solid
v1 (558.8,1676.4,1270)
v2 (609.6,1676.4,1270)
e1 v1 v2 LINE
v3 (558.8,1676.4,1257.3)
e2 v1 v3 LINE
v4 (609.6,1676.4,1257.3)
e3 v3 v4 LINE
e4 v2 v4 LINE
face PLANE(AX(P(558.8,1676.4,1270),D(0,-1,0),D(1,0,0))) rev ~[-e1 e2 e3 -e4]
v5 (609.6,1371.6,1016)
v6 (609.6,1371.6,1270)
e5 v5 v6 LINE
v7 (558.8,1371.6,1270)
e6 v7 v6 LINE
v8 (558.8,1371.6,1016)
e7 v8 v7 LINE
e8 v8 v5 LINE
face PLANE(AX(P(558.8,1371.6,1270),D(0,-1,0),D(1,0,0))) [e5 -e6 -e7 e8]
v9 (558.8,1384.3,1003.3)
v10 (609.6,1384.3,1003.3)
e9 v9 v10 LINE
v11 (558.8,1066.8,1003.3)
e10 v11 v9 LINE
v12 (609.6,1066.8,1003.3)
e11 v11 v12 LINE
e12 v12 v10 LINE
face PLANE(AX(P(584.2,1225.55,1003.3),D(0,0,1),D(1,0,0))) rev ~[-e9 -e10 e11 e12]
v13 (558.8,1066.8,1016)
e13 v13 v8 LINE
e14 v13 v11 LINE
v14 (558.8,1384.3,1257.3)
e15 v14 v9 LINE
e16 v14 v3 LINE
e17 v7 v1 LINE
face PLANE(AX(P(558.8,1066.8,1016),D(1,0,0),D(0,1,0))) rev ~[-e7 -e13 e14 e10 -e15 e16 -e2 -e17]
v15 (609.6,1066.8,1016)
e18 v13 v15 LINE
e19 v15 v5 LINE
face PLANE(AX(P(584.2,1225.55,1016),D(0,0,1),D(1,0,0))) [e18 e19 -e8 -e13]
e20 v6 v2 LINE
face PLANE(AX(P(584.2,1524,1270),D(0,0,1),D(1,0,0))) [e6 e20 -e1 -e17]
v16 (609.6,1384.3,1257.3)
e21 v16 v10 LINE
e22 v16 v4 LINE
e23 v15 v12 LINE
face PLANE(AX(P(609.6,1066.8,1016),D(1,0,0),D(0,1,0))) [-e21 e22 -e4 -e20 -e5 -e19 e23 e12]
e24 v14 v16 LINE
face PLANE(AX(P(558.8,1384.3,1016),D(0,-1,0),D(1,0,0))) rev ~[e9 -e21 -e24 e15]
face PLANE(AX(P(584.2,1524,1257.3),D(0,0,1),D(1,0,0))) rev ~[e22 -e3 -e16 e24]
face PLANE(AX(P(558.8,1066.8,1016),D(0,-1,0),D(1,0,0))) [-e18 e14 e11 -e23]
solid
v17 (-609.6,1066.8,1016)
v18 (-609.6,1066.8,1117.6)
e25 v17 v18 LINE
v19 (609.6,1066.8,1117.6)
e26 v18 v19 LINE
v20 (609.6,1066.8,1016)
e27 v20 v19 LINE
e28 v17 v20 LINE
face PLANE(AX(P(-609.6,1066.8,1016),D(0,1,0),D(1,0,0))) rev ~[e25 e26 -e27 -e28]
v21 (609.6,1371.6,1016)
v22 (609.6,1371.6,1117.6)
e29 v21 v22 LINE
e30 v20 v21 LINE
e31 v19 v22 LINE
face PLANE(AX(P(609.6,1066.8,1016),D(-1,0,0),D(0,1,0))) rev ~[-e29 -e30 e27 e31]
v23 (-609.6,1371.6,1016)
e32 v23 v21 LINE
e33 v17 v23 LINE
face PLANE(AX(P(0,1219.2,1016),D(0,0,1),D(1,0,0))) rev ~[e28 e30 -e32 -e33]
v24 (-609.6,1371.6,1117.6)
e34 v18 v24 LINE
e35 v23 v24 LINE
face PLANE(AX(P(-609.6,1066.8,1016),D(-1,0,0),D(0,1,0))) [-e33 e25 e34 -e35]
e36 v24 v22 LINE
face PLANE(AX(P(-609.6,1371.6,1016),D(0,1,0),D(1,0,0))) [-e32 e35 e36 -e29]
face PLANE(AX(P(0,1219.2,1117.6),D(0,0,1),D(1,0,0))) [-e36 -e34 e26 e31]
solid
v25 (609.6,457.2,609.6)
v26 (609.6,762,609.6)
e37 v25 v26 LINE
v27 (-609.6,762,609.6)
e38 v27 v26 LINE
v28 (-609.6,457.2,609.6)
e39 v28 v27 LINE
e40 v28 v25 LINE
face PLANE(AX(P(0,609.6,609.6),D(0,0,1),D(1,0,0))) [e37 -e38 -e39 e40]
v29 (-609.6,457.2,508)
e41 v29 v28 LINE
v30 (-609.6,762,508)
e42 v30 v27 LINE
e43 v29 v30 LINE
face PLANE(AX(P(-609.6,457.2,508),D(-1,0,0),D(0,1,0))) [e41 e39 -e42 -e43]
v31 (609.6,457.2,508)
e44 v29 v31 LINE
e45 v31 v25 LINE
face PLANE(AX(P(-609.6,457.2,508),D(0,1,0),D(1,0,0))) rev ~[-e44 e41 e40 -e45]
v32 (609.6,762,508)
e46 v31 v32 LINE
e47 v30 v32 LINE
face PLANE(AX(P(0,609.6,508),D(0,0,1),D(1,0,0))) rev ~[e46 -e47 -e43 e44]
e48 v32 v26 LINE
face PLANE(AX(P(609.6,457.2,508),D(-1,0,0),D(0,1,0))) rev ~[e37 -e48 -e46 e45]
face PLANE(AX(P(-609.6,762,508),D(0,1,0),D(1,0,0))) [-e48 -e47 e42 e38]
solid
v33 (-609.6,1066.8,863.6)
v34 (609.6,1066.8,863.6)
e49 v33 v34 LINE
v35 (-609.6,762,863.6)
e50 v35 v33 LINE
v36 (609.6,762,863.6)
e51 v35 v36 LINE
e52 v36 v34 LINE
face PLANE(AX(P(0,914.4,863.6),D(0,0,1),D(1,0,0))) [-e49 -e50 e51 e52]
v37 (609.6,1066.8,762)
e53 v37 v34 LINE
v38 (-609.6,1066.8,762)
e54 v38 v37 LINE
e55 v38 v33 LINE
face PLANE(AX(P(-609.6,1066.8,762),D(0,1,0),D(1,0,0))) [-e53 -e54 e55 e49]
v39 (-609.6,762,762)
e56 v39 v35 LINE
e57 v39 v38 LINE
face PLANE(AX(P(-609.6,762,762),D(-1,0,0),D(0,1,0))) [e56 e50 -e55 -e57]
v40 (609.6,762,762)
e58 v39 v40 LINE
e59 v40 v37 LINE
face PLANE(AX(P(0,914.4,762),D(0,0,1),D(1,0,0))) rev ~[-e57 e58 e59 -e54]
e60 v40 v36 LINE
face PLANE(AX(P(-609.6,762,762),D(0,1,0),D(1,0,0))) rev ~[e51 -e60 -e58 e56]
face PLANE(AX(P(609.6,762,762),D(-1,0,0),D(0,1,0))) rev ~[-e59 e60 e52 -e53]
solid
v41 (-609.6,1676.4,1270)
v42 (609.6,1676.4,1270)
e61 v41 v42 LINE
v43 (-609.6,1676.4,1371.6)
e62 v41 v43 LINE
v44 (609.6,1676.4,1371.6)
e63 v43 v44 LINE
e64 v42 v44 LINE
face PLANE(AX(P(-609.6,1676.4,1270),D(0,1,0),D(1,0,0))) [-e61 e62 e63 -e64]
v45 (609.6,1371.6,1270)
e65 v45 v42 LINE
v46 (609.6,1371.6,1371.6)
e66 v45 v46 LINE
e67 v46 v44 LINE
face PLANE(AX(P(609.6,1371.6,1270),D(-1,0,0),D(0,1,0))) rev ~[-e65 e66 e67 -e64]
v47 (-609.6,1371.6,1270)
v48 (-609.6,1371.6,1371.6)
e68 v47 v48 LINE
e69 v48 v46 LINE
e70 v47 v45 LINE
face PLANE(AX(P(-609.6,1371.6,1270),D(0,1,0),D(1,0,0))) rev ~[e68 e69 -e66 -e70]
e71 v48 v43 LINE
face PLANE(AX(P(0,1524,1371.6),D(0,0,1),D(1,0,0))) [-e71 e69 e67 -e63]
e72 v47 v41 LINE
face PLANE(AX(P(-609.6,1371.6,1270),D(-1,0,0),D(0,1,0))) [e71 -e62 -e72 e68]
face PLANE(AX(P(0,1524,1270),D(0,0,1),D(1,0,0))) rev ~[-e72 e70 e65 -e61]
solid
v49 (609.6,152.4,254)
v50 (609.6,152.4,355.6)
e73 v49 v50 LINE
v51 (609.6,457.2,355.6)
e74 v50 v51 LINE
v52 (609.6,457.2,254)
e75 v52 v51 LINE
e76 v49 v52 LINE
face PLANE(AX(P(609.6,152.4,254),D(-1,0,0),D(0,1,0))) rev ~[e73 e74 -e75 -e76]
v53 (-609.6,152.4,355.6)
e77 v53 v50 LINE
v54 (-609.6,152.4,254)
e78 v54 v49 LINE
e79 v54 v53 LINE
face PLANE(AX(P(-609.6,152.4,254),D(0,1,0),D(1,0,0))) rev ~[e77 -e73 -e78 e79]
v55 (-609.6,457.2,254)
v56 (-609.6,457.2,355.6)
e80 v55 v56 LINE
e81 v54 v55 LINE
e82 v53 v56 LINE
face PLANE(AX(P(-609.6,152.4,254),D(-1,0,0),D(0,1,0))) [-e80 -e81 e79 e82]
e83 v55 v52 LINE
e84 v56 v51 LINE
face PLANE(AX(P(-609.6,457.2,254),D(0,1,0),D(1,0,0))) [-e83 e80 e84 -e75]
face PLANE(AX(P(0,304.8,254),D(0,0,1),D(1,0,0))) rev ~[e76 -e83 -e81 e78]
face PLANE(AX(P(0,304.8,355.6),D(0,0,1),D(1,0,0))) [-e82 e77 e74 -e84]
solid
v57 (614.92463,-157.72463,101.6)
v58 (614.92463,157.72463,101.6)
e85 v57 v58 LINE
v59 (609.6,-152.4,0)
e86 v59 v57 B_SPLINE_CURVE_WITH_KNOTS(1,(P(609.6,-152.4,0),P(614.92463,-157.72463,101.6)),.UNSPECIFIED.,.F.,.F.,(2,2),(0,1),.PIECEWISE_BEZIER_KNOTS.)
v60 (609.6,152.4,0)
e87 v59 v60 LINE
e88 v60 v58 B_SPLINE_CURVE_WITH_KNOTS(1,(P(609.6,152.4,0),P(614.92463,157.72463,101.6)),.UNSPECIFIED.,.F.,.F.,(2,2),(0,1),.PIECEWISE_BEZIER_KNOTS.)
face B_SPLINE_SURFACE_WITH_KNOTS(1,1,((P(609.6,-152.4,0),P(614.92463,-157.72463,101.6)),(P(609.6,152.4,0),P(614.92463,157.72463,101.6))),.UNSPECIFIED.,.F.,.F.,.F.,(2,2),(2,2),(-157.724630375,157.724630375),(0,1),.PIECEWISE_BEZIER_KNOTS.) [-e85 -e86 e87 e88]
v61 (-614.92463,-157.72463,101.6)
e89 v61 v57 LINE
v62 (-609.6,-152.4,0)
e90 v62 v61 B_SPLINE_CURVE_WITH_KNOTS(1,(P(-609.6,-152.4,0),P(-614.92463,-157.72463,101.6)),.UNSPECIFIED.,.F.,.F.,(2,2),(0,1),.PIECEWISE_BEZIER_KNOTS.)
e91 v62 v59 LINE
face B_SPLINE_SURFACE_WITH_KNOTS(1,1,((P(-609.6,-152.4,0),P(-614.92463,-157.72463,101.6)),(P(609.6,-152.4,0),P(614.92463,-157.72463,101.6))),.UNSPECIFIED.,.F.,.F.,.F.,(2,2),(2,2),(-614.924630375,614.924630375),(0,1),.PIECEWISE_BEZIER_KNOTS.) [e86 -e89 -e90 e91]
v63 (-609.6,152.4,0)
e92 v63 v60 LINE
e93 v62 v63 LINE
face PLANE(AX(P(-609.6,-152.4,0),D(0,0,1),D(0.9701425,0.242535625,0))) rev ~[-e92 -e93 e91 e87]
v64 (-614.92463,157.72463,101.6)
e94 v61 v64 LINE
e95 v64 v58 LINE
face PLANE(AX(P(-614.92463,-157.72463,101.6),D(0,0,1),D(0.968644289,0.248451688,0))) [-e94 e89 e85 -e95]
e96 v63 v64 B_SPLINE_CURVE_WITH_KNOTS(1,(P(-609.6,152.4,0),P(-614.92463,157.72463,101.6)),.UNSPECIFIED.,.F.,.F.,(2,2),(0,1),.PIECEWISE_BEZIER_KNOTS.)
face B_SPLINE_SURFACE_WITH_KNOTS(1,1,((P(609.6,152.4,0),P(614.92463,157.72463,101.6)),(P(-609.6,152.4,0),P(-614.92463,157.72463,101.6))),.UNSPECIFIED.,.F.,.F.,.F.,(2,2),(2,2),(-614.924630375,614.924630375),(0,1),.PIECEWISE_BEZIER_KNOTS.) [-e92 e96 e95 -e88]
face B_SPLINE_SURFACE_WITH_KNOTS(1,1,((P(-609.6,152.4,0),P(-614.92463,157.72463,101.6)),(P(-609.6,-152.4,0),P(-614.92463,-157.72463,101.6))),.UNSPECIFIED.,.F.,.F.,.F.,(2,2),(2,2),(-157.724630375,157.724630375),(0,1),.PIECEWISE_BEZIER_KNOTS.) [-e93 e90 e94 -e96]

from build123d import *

# Parameters (mm, degrees)
F0_W      = 1219.2
F0_H      = 304.8
F1_DEPTH  = 101.6
F1_TAPER  = -3
F3_W      = 1219.2
F3_H      = 304.8
F4_DEPTH  = 101.6
F6_W      = 1219.2
F6_H      = 304.8
F7_DEPTH  = 101.6
F9_W      = 1219.2
F9_H      = 304.8
F10_DEPTH = 101.6
F12_W     = 1219.2
F12_H     = 304.8
F13_DEPTH = 101.6
F15_W     = 1219.2
F15_H     = 304.8
F16_DEPTH = 101.6
F18_W     = 50.8
F18_H     = 241.3
F19_DEPTH = 12.7
F20_W     = 50.8
F20_H     = 304.8
F21_DEPTH = 12.7
F22_W     = 50.8
F22_H     = 317.5
F23_DEPTH = 12.7


with BuildPart() as f1:
    # F0 (on Top) → F1 (new body)
    with BuildSketch(Plane.XY):
        Rectangle(F0_W, F0_H)
    extrude(amount=F1_DEPTH, taper=F1_TAPER)


with BuildPart() as f4:
    # F3 (on offset) → F4 (new body)
    with BuildSketch(Plane.XY.offset(254)):
        with Locations((0, 304.8)):
            Rectangle(F3_W, F3_H)
    extrude(amount=F4_DEPTH)


with BuildPart() as f7:
    # F6 (on offset) → F7 (new body)
    with BuildSketch(Plane.XY.offset(508)):
        with Locations((0, 609.6)):
            Rectangle(F6_W, F6_H)
    extrude(amount=F7_DEPTH)


with BuildPart() as f10:
    # F9 (on offset) → F10 (new body)
    with BuildSketch(Plane.XY.offset(762)):
        with Locations((0, 914.4)):
            Rectangle(F9_W, F9_H)
    extrude(amount=F10_DEPTH)


with BuildPart() as f13:
    # F12 (on offset) → F13 (new body)
    with BuildSketch(Plane.XY.offset(1016)):
        with Locations((0, 1219.2)):
            Rectangle(F12_W, F12_H)
    extrude(amount=F13_DEPTH)


with BuildPart() as f16:
    # F15 (on offset) → F16 (new body)
    with BuildSketch(Plane.XY.offset(1270)):
        with Locations((0, 1524)):
            Rectangle(F15_W, F15_H)
    extrude(amount=F16_DEPTH)


with BuildPart() as f19:
    # F18 (on offset) → F19 (new body)
    with BuildSketch(Plane.XZ.offset(-1371.6)):
        with Locations((584.2, 1136.65)):
            Rectangle(F18_W, F18_H)
    extrude(amount=-F19_DEPTH)

    # F20 (on offset) → F21 (join)
    with BuildSketch(Plane.XY.offset(1270)):
        with Locations((584.2, 1524)):
            Rectangle(F20_W, F20_H)
    extrude(amount=-F21_DEPTH)

    # F22 (on offset) → F23 (join)
    with BuildSketch(Plane.XY.offset(1016)):
        with Locations((584.2, 1225.55)):
            Rectangle(F22_W, F22_H)
    extrude(amount=-F23_DEPTH)


solid = Compound([f1.part, f4.part, f7.part, f10.part, f13.part, f16.part, f19.part])
